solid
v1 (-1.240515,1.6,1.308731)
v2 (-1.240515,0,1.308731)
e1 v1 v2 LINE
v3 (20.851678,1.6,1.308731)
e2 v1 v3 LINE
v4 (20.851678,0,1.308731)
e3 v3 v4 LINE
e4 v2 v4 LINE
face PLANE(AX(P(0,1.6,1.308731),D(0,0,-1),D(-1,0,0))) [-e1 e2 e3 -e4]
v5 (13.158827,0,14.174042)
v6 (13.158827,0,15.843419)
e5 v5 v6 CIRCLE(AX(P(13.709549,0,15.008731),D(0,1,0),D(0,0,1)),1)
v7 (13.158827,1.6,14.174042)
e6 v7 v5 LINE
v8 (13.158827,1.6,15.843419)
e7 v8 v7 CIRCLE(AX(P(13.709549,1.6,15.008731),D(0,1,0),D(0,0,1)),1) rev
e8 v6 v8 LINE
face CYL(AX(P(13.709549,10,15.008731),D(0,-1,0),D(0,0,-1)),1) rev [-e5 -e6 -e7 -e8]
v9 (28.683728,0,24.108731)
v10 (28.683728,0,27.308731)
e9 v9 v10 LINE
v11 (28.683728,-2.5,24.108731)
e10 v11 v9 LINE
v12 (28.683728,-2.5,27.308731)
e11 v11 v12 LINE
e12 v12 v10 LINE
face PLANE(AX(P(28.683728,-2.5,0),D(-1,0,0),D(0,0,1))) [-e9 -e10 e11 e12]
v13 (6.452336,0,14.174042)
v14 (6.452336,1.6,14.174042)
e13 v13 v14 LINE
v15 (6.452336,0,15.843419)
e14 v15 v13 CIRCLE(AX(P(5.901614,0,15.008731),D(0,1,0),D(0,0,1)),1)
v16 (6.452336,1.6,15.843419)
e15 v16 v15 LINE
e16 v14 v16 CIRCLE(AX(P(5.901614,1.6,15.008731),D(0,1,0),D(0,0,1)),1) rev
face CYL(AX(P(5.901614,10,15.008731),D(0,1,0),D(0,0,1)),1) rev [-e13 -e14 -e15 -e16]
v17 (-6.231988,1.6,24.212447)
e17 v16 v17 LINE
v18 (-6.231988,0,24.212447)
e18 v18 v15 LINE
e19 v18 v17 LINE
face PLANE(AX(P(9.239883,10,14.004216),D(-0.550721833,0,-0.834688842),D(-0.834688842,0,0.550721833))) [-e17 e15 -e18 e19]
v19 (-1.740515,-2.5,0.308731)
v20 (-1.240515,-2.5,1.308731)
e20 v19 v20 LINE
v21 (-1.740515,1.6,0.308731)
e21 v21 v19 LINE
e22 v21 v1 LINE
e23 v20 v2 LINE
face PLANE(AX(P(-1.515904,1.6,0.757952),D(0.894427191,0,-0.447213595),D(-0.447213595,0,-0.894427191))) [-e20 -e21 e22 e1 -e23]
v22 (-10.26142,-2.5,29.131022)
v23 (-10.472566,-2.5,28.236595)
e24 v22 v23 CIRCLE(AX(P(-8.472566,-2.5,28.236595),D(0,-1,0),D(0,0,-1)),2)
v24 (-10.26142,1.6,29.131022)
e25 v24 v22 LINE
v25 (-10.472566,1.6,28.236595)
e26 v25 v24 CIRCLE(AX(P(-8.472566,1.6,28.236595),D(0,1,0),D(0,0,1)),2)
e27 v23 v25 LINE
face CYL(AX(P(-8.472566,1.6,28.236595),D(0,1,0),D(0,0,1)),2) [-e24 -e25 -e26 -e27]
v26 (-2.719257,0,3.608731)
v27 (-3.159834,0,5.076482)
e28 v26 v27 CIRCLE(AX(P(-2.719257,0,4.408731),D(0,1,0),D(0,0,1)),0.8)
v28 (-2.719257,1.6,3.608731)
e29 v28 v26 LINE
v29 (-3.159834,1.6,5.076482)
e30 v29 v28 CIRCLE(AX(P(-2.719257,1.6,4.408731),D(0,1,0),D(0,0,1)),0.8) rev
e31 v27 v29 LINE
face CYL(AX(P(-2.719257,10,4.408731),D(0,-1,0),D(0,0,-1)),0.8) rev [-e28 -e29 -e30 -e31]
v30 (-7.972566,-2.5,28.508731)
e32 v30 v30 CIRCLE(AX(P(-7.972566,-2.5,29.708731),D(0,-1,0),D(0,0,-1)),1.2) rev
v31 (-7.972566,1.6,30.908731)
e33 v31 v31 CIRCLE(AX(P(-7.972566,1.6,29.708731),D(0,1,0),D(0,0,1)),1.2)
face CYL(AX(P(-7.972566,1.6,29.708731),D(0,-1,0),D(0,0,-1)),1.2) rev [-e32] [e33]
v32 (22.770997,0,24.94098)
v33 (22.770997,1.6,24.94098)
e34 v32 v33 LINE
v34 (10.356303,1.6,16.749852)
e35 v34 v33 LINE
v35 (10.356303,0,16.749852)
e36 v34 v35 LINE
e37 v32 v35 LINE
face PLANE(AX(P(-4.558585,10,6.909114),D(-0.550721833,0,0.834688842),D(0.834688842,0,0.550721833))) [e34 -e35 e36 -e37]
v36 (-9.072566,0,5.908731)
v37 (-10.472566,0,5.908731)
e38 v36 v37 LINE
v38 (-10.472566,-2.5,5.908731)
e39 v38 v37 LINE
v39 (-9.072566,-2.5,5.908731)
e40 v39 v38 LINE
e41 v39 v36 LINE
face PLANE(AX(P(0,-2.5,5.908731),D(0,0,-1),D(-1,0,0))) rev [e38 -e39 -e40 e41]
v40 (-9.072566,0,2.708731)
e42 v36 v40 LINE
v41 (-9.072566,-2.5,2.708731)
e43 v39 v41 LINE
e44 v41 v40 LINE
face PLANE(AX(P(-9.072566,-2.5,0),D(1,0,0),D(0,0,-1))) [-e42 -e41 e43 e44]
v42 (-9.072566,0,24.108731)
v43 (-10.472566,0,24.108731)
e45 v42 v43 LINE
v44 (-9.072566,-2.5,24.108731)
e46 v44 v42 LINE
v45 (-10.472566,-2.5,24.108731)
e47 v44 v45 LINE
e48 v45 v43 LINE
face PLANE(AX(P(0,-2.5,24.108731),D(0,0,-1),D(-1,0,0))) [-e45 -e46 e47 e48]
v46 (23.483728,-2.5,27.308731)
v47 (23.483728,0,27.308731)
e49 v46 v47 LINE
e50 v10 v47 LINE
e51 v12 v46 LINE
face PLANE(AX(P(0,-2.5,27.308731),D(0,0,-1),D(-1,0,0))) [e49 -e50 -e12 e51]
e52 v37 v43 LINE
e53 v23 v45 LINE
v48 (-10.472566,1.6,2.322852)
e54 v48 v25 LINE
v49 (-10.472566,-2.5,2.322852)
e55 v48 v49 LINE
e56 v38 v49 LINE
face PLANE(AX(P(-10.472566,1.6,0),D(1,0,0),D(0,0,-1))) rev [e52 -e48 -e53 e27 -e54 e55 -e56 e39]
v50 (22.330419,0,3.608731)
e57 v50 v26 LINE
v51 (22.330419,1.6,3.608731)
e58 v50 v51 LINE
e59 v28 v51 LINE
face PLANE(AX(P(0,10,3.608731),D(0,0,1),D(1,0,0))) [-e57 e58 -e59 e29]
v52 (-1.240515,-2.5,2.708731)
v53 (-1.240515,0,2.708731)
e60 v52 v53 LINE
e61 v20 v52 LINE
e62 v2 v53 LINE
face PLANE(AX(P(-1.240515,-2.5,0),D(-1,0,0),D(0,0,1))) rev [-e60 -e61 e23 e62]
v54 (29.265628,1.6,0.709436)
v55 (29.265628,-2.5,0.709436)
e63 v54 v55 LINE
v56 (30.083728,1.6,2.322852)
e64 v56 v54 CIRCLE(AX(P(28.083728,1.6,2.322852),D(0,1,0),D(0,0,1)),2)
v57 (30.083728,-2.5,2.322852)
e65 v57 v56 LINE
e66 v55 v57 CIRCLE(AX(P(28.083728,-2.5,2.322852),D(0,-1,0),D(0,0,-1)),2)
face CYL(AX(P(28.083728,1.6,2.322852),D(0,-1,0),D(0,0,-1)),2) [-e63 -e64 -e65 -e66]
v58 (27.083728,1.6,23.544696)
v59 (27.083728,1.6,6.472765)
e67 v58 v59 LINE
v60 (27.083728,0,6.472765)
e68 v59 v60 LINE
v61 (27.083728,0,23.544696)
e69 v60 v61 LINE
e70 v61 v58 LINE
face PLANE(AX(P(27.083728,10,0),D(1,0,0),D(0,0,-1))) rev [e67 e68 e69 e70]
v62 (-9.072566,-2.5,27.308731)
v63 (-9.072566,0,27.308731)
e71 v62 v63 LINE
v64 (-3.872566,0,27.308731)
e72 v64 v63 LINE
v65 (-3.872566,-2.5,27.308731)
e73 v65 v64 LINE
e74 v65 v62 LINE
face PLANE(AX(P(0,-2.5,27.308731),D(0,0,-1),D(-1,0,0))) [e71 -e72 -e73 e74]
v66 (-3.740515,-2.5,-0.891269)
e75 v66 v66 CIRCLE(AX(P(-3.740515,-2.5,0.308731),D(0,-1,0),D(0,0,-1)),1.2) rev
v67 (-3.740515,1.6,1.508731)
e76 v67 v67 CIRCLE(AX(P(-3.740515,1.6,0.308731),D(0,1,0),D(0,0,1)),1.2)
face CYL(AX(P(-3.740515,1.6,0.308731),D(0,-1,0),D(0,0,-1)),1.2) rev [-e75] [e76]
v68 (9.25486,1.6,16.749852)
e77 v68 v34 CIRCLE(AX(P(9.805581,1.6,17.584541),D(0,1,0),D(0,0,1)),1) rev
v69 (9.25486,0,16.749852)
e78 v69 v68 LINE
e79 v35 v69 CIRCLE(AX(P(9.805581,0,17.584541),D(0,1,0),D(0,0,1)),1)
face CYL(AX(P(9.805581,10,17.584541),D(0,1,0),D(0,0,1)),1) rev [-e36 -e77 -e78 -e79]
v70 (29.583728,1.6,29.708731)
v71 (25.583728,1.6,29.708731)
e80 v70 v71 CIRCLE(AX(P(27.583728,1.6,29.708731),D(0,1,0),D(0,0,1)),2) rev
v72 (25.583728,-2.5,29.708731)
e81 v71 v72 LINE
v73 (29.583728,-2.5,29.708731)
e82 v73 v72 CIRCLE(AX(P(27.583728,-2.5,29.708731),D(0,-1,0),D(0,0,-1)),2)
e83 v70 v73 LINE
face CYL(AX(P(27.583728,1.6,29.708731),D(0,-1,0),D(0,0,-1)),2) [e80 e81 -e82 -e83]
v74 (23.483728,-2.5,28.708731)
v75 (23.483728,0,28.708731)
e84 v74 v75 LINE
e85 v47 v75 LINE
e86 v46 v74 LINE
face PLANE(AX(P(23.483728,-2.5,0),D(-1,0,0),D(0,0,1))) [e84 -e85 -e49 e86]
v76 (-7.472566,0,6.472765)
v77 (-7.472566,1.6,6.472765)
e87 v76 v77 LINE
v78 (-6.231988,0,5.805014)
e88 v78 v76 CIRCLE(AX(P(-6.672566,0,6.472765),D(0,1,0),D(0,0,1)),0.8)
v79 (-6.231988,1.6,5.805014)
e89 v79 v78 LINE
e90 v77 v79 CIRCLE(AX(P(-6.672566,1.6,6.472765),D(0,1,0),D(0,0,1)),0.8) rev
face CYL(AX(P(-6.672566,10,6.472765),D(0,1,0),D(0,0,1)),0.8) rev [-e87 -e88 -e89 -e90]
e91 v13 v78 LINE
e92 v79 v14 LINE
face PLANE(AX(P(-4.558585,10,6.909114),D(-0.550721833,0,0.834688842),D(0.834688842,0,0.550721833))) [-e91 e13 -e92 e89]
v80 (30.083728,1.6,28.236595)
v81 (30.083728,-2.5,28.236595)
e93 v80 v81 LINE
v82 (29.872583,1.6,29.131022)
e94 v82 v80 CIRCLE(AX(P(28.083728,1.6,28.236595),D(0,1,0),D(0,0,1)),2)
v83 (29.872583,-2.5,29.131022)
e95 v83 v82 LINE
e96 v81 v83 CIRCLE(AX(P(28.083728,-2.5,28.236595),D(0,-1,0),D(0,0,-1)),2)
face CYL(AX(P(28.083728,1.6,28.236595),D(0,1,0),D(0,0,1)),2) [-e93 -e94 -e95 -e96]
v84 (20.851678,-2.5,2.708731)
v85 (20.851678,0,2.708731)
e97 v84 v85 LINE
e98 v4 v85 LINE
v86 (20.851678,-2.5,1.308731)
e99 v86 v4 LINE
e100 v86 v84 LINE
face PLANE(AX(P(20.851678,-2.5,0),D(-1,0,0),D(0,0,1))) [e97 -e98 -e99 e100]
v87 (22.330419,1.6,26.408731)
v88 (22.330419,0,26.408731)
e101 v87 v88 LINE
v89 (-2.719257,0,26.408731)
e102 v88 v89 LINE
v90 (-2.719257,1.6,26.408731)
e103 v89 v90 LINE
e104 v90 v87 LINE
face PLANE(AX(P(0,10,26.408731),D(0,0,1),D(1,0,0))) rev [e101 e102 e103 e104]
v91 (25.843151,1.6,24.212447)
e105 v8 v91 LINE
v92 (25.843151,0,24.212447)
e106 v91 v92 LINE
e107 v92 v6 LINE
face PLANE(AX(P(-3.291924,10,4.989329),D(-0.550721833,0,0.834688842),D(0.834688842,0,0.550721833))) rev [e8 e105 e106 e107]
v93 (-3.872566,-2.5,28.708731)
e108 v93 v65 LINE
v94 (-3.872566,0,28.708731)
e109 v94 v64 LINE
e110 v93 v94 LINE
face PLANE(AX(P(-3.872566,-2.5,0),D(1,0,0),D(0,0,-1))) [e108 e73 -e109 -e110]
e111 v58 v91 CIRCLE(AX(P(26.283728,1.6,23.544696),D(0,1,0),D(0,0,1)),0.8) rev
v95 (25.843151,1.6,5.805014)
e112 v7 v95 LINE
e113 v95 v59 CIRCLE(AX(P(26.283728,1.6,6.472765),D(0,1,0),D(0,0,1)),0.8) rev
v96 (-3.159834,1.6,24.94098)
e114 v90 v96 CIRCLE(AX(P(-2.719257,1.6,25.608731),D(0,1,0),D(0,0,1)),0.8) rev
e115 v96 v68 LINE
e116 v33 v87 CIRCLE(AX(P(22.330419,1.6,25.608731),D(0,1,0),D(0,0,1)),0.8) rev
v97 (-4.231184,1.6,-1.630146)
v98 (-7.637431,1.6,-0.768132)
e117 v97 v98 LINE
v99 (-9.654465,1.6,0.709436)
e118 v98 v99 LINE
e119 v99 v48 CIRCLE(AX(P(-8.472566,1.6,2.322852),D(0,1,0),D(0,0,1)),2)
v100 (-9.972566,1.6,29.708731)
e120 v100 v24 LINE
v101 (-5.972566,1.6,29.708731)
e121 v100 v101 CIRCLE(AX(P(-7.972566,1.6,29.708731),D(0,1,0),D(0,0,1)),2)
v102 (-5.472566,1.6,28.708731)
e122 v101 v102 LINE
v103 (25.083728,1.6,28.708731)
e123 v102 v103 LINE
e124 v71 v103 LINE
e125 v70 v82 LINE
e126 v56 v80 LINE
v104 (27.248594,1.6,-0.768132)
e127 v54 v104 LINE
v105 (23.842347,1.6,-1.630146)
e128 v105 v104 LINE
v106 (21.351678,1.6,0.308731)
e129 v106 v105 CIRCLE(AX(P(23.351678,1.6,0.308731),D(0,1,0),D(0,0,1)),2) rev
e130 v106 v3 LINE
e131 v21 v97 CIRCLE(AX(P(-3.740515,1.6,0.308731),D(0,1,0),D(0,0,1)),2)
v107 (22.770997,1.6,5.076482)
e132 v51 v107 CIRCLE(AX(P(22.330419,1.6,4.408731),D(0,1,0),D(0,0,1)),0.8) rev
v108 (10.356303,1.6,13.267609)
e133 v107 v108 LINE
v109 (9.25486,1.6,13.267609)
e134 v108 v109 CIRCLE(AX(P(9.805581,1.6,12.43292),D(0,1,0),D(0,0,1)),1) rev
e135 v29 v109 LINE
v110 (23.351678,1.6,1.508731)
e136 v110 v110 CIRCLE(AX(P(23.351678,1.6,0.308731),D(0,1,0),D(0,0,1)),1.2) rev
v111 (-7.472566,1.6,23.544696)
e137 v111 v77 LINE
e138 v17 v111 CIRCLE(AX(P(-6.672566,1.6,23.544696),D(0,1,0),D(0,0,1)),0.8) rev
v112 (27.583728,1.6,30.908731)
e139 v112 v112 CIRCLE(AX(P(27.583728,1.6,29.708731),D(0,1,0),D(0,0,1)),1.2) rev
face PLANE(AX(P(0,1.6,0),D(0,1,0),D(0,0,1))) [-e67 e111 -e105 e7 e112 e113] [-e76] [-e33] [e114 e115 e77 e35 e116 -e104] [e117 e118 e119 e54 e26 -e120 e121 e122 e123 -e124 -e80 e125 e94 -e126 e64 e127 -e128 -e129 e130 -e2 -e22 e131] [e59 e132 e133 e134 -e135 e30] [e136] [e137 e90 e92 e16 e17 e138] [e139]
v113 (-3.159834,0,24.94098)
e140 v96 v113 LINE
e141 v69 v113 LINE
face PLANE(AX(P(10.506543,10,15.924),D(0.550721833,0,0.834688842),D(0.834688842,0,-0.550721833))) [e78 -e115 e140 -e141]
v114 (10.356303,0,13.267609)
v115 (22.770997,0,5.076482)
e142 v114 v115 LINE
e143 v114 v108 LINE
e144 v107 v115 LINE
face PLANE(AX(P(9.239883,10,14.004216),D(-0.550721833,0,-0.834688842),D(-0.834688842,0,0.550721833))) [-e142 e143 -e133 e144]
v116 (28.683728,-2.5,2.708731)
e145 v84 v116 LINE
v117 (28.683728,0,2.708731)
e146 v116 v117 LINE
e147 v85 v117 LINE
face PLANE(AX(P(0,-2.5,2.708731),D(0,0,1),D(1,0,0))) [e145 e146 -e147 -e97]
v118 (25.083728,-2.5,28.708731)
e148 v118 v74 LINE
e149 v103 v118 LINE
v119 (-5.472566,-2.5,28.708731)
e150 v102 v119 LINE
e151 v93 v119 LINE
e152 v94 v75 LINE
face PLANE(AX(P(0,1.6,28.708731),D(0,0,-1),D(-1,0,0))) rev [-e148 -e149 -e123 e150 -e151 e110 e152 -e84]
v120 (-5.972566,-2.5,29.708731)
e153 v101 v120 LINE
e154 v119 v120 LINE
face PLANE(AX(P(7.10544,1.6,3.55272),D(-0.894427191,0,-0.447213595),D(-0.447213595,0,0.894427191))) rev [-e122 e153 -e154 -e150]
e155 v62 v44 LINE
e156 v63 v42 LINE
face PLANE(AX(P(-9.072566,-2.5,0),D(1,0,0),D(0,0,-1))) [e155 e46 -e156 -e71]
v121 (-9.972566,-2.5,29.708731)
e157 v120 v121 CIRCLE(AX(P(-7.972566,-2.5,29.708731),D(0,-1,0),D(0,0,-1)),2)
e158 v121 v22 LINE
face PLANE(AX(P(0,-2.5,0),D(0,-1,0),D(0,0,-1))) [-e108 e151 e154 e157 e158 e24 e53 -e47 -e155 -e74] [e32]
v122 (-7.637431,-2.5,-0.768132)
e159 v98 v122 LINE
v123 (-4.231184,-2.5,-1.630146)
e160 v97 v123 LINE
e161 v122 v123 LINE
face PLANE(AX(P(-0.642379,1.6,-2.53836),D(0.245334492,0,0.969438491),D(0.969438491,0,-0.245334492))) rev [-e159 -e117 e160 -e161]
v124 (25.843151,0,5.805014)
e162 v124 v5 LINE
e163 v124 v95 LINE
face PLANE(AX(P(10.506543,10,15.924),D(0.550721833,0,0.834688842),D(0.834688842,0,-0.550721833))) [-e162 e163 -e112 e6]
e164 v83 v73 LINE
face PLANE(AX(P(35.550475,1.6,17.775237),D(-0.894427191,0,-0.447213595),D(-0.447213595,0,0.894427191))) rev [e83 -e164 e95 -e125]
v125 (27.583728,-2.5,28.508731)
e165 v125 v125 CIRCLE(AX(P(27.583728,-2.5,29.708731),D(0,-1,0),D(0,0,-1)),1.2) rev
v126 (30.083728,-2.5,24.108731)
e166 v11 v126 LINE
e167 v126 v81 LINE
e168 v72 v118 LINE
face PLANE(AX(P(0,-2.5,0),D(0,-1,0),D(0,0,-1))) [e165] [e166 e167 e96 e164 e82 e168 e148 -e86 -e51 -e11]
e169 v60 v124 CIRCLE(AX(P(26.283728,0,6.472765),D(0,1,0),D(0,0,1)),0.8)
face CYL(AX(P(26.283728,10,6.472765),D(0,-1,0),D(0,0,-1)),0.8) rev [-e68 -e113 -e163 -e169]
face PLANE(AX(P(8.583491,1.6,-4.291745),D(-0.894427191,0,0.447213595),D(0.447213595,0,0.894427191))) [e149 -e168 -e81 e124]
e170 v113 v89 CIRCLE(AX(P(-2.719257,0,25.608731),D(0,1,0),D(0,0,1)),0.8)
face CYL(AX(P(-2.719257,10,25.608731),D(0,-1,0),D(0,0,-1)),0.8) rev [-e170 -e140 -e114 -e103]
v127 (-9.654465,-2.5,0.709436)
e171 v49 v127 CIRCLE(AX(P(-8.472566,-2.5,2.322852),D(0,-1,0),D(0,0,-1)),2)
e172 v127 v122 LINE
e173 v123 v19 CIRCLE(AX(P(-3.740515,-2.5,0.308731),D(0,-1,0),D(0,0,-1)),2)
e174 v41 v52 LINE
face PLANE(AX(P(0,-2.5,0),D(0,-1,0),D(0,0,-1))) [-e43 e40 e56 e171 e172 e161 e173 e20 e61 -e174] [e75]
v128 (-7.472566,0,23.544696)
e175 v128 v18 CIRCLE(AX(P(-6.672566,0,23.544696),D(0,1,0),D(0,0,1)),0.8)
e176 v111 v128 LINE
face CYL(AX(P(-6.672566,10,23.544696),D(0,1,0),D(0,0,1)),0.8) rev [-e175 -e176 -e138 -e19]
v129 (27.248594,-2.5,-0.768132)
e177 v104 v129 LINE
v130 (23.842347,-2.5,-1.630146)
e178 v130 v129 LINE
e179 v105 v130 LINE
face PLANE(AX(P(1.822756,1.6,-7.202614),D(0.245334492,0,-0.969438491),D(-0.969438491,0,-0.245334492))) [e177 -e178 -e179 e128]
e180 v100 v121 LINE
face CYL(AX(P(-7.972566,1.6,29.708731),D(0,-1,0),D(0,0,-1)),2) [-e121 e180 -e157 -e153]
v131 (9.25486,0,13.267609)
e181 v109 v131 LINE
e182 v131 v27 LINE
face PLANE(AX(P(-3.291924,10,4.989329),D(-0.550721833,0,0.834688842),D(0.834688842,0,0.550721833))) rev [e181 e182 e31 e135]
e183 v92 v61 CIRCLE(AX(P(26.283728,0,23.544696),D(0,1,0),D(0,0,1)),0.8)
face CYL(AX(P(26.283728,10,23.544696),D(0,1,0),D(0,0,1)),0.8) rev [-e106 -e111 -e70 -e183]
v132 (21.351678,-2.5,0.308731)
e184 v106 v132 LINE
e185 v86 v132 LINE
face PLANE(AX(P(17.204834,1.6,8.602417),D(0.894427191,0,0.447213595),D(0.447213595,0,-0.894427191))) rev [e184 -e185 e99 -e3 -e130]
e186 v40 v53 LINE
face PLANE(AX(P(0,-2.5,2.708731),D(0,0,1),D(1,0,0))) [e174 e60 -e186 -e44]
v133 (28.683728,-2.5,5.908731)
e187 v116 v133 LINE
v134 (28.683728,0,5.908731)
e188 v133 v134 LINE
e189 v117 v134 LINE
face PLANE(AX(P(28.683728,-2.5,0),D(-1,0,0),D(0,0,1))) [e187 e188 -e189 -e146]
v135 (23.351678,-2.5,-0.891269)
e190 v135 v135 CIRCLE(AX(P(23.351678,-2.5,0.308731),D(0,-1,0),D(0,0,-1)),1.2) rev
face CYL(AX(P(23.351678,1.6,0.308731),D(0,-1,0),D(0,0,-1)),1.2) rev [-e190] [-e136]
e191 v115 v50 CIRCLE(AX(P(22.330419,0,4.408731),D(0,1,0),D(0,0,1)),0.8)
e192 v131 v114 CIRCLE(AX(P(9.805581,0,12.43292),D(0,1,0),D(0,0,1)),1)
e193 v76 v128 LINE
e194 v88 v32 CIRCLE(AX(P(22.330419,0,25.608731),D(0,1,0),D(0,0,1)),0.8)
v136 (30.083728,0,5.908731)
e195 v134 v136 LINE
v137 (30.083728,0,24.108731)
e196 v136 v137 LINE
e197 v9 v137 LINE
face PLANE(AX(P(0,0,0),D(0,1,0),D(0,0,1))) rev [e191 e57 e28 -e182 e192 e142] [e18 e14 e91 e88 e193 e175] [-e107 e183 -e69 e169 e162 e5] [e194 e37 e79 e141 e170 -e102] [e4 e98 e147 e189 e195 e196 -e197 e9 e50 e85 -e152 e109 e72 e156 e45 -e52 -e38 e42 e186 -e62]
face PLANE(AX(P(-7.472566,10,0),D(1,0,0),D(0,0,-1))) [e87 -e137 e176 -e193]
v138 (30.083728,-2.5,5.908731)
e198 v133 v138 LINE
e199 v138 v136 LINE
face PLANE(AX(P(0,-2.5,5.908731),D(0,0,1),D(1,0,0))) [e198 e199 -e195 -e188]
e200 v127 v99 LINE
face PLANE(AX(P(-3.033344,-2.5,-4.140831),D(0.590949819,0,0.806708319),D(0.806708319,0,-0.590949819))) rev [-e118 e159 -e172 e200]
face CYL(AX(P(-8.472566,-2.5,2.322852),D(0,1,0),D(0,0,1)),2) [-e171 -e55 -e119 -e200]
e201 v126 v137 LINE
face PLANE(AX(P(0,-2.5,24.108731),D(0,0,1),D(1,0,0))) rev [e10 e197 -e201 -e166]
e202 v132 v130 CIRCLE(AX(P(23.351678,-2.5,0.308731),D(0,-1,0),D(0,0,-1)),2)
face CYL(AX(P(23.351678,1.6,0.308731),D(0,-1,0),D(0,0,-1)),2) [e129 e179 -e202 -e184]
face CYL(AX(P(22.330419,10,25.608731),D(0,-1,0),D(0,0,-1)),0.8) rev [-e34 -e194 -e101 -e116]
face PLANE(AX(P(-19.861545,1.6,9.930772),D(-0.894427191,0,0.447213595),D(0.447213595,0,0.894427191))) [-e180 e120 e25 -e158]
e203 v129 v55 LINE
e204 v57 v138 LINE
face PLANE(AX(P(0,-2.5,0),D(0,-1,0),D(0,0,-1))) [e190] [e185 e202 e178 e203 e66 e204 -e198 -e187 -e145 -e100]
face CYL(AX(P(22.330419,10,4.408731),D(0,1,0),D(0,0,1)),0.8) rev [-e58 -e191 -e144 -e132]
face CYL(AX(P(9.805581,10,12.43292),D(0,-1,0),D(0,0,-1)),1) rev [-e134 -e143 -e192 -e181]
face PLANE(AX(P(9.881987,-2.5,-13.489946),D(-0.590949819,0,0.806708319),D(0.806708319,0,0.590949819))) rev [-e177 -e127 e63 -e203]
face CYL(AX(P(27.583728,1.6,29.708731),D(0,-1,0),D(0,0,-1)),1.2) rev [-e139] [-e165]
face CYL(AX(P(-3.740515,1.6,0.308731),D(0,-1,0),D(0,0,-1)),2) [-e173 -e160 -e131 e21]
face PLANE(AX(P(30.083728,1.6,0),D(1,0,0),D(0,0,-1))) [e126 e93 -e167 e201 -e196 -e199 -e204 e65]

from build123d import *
from build123d.topology import SkipClean

# Parameters (mm, degrees)
SKETCH1_R                = 1.38
SKETCH1_R_2              = 1
SKETCH1_W                = 37.356294072
SKETCH1_H                = 24.2
BOSS_EXTRUDE2_DEPTH      = 1.6
BOSS_EXTRUDE3_START      = 2.5
SKETCH3_R                = 1
BOSS_EXTRUDE3_DEPTH      = 2.5
SKETCH3_5_R              = 1.38
CUT_EXTRUDE1_DEPTH       = 3
MOVE_START               = -2.5
MOVE_FACE2_OUTLINE_R     = 1.2
MOVE_FACE2_OUTLINE_R_2   = 1
MOVE_FACE2_DEPTH         = 2.5
MOVE_FACE2_2_OUTLINE_R   = 1.2
MOVE_FACE2_2_OUTLINE_R_2 = 1
MOVE_FACE2_2_DEPTH       = 1.6
FILLET4_R                = 2
CUT_EXTRUDE2_DEPTH       = 10
FILLET6_R                = 1
FILLET7_R                = 0.8


# Read off the part's stored shape, not the designer's step: Move Face2
with BuildPart() as part:
    # Sketch1 → Boss-Extrude2 (new body)
    # profile 1 of 2: a face of its own
    with BuildSketch(Plane(origin=(0, 0, 0), x_dir=(1, 0, 0), z_dir=(0, 1, 0))):
        with BuildLine():
            ThreePointArc((29.583728431, -29.708730606), (27.583728431, -31.708730606), (25.583728431, -29.708730606))
            Line((25.583728431, -29.708730606), (25.083728431, -28.708730606))
            Line((25.083728431, -28.708730606), (9.805581395, -28.708730606))
            Line((9.805581395, -28.708730606), (-5.472565641, -28.708730606))
            Line((-5.472565641, -28.708730606), (-5.972565641, -29.708730606))
            ThreePointArc((-5.972565641, -29.708730606), (-7.972565641, -31.708730606), (-9.972565641, -29.708730606))
            Line((-9.972565641, -29.708730606), (-10.472565641, -28.708730606))
            Line((-10.472565641, -28.708730606), (-10.472565641, -6.308730606))
            Line((-10.472565641, -6.308730606), (-14.622565641, 1.591269394))
            ThreePointArc((-14.622565641, 1.591269394), (-16.743885984, 6.712589737), (-11.622565641, 4.591269394))
            Line((-11.622565641, 4.591269394), (-7.637430915, 0.768132014))
            Line((-7.637430915, 0.768132014), (-4.231183814, 1.630146375))
            ThreePointArc((-4.231183814, 1.630146375), (-2.511966494, 1.269454739), (-1.740514831, -0.308730606))
            Line((-1.740514831, -0.308730606), (-1.240514831, -1.308730606))
            Line((-1.240514831, -1.308730606), (20.851677621, -1.308730606))
            Line((20.851677621, -1.308730606), (21.351677621, -0.308730606))
            ThreePointArc((21.351677621, -0.308730606), (22.123129284, 1.269454739), (23.842346605, 1.630146375))
            Line((23.842346605, 1.630146375), (27.248593706, 0.768132014))
            Line((27.248593706, 0.768132014), (31.233728431, 4.591269394))
            ThreePointArc((31.233728431, 4.591269394), (36.355048775, 6.712589737), (34.233728431, 1.591269394))
            Line((34.233728431, 1.591269394), (30.083728431, -6.308730606))
            Line((30.083728431, -6.308730606), (30.083728431, -28.708730606))
            Line((30.083728431, -28.708730606), (29.583728431, -29.708730606))
        make_face()
        with Locations(Location((34.233728431, 4.591269394, 0), (0, 0, 270))):
            Circle(SKETCH1_R, mode=Mode.SUBTRACT)
        with Locations(Location((23.351677621, -0.308730606, 0), (0, 0, 270))):
            Circle(SKETCH1_R_2, mode=Mode.SUBTRACT)
        with Locations(Location((-3.740514831, -0.308730606, 0), (0, 0, 270))):
            Circle(SKETCH1_R_2, mode=Mode.SUBTRACT)
        with Locations(Location((-7.972565641, -29.708730606, 0), (0, 0, 270))):
            Circle(SKETCH1_R_2, mode=Mode.SUBTRACT)
        with Locations(Location((-14.622565641, 4.591269394, 0), (0, 0, 270))):
            Circle(SKETCH1_R, mode=Mode.SUBTRACT)
        with Locations(Location((27.583728431, -29.708730606, 0), (0, 0, 270))):
            Circle(SKETCH1_R_2, mode=Mode.SUBTRACT)
        with Locations((9.805581395, -15.008730606)):
            Rectangle(SKETCH1_W, SKETCH1_H, mode=Mode.SUBTRACT)
    # profile 2 of 2: a face of its own
    with BuildSketch(Plane(origin=(0, 0, 0), x_dir=(1, 0, 0), z_dir=(0, 1, 0))):
        with Locations((9.805581395, -15.008730606)):
            Rectangle(SKETCH1_W, SKETCH1_H)
    extrude(amount=BOSS_EXTRUDE2_DEPTH)

    # Sketch3 → Boss-Extrude3 (add)
    # profile 1 of 4: a face of its own
    with SkipClean():  # the faces are left unmerged after this step: merging them gives an invalid solid
        with BuildSketch(Plane.XZ.offset(BOSS_EXTRUDE3_START)):
            with BuildLine():
                Line((23.483728431, 27.108730606), (28.483728431, 27.108730606))
                Line((28.483728431, 27.108730606), (28.483728431, 24.108730606))
                Line((28.483728431, 24.108730606), (30.083728431, 24.108730606))
                Line((30.083728431, 24.108730606), (30.083728431, 28.708730606))
                Line((30.083728431, 28.708730606), (29.583728431, 29.708730606))
                ThreePointArc((29.583728431, 29.708730606), (27.583728431, 31.708730606), (25.583728431, 29.708730606))
                Line((25.583728431, 29.708730606), (25.083728431, 28.708730606))
                Line((25.083728431, 28.708730606), (23.483728431, 28.708730606))
                Line((23.483728431, 28.708730606), (23.483728431, 27.108730606))
            make_face()
            with Locations(Location((27.583728431, 29.708730606, 0), (0, 0, 270))):
                Circle(SKETCH3_R, mode=Mode.SUBTRACT)
        # profile 2 of 4: a face of its own
        with BuildSketch(Plane.XZ.offset(BOSS_EXTRUDE3_START)):
            with BuildLine():
                Line((-8.872565641, 27.108730606), (-3.872565641, 27.108730606))
                Line((-3.872565641, 27.108730606), (-3.872565641, 28.708730606))
                Line((-3.872565641, 28.708730606), (-5.472565641, 28.708730606))
                Line((-5.472565641, 28.708730606), (-5.972565641, 29.708730606))
                ThreePointArc((-5.972565641, 29.708730606), (-7.972565641, 31.708730606), (-9.972565641, 29.708730606))
                Line((-9.972565641, 29.708730606), (-10.472565641, 28.708730606))
                Line((-10.472565641, 28.708730606), (-10.472565641, 24.108730606))
                Line((-10.472565641, 24.108730606), (-8.872565641, 24.108730606))
                Line((-8.872565641, 24.108730606), (-8.872565641, 27.108730606))
            make_face()
            with Locations(Location((-7.972565641, 29.708730606, 0), (0, 0, 270))):
                Circle(SKETCH3_R, mode=Mode.SUBTRACT)
        # profile 3 of 4: a face of its own
        with BuildSketch(Plane.XZ.offset(BOSS_EXTRUDE3_START)):
            with BuildLine():
                Line((30.083728431, 5.908730606), (28.483728431, 5.908730606))
                Line((28.483728431, 5.908730606), (28.483728431, 2.908730606))
                Line((28.483728431, 2.908730606), (20.851677621, 2.908730606))
                Line((20.851677621, 2.908730606), (20.851677621, 1.308730606))
                Line((20.851677621, 1.308730606), (21.351677621, 0.308730606))
                ThreePointArc((21.351677621, 0.308730606), (22.123129284, -1.269454739), (23.842346605, -1.630146375))
                Line((23.842346605, -1.630146375), (27.248593706, -0.768132014))
                Line((27.248593706, -0.768132014), (30.083728431, 1.308730606))
                Line((30.083728431, 1.308730606), (30.083728431, 5.908730606))
            make_face()
            with Locations(Location((23.351677621, 0.308730606, 0), (0, 0, 270))):
                Circle(SKETCH3_R, mode=Mode.SUBTRACT)
        # profile 4 of 4: a face of its own
        with BuildSketch(Plane.XZ.offset(BOSS_EXTRUDE3_START)):
            with BuildLine():
                Line((-8.872565641, 2.908730606), (-8.872565641, 5.908730606))
                Line((-8.872565641, 5.908730606), (-10.472565641, 5.908730606))
                Line((-10.472565641, 5.908730606), (-10.472565641, 1.308730606))
                Line((-10.472565641, 1.308730606), (-7.637430915, -0.768132014))
                Line((-7.637430915, -0.768132014), (-4.231183814, -1.630146375))
                ThreePointArc((-4.231183814, -1.630146375), (-2.511966494, -1.269454739), (-1.740514831, 0.308730606))
                Line((-1.740514831, 0.308730606), (-1.240514831, 1.308730606))
                Line((-1.240514831, 1.308730606), (-1.240514831, 2.908730606))
                Line((-1.240514831, 2.908730606), (-8.872565641, 2.908730606))
            make_face()
            with Locations(Location((-3.740514831, 0.308730606, 0), (0, 0, 270))):
                Circle(SKETCH3_R, mode=Mode.SUBTRACT)
        extrude(amount=-BOSS_EXTRUDE3_DEPTH)

    # Sketch3<5> → Cut-Extrude1 (cut)
    # profile 1 of 2: a face of its own
    with SkipClean():  # the faces are left unmerged after this step: merging them gives an invalid solid
        with BuildSketch(Plane.XZ):
            with BuildLine():
                Line((27.248593706, -0.768132014), (30.083728431, 1.308730606))
                Line((30.083728431, 1.308730606), (30.083728431, 6.308730606))
                Line((30.083728431, 6.308730606), (34.233728431, -1.591269394))
                ThreePointArc((34.233728431, -1.591269394), (36.355048775, -6.712589737), (31.233728431, -4.591269394))
                Line((31.233728431, -4.591269394), (27.248593706, -0.768132014))
            make_face()
            with Locations((34.233728431, -4.591269394)):
                Circle(SKETCH3_5_R, mode=Mode.SUBTRACT)
        # profile 2 of 2: a face of its own
        with BuildSketch(Plane.XZ):
            with BuildLine():
                Line((-10.472565641, 1.308730606), (-7.637430915, -0.768132014))
                Line((-7.637430915, -0.768132014), (-11.622565641, -4.591269394))
                ThreePointArc((-11.622565641, -4.591269394), (-16.743885984, -6.712589737), (-14.622565641, -1.591269394))
                Line((-14.622565641, -1.591269394), (-10.472565641, 6.308730606))
                Line((-10.472565641, 6.308730606), (-10.472565641, 1.308730606))
            make_face()
            with Locations((-14.622565641, -4.591269394)):
                Circle(SKETCH3_5_R, mode=Mode.SUBTRACT)
        extrude(amount=-CUT_EXTRUDE1_DEPTH, mode=Mode.SUBTRACT)

    # Move Face2 outline → Move Face2 (cut)
    # profile 1 of 8: a face of its own
    with BuildSketch(Plane(origin=(0, 0, 0), x_dir=(1, 0, 0), z_dir=(0, 1, 0)).offset(MOVE_START)):
        with Locations((-7.972565641, -29.708730606)):
            Circle(MOVE_FACE2_OUTLINE_R)
        with Locations((-7.972565641, -29.708730606)):
            Circle(MOVE_FACE2_OUTLINE_R_2, mode=Mode.SUBTRACT)
    # profile 2 of 8: a face of its own
    with BuildSketch(Plane(origin=(0, 0, 0), x_dir=(1, 0, 0), z_dir=(0, 1, 0)).offset(MOVE_START)):
        with Locations((-3.740514831, -0.308730606)):
            Circle(MOVE_FACE2_OUTLINE_R)
        with Locations((-3.740514831, -0.308730606)):
            Circle(MOVE_FACE2_OUTLINE_R_2, mode=Mode.SUBTRACT)
    # profile 3 of 8: a face of its own
    with BuildSketch(Plane(origin=(0, 0, 0), x_dir=(1, 0, 0), z_dir=(0, 1, 0)).offset(MOVE_START)):
        with Locations((23.351677621, -0.308730606)):
            Circle(MOVE_FACE2_OUTLINE_R)
        with Locations((23.351677621, -0.308730606)):
            Circle(MOVE_FACE2_OUTLINE_R_2, mode=Mode.SUBTRACT)
    # profile 4 of 8: a face of its own
    with BuildSketch(Plane(origin=(0, 0, 0), x_dir=(1, 0, 0), z_dir=(0, 1, 0)).offset(MOVE_START)):
        with Locations((27.583728431, -29.708730606)):
            Circle(MOVE_FACE2_OUTLINE_R)
        with Locations((27.583728431, -29.708730606)):
            Circle(MOVE_FACE2_OUTLINE_R_2, mode=Mode.SUBTRACT)
    # profile 5 of 8: a face of its own
    with BuildSketch(Plane(origin=(0, 0, 0), x_dir=(1, 0, 0), z_dir=(0, 1, 0)).offset(MOVE_START)):
        Polygon((23.483728431, -27.308730606), (28.683728431, -27.308730606), (28.683728431, -24.108730606), (28.483728431, -24.108730606), (28.483728431, -27.108730606), (23.483728431, -27.108730606), align=None)
    # profile 6 of 8: a face of its own
    with BuildSketch(Plane(origin=(0, 0, 0), x_dir=(1, 0, 0), z_dir=(0, 1, 0)).offset(MOVE_START)):
        Polygon((-9.072565641, -27.308730606), (-3.872565641, -27.308730606), (-3.872565641, -27.108730606), (-8.872565641, -27.108730606), (-8.872565641, -24.108730606), (-9.072565641, -24.108730606), align=None)
    # profile 7 of 8: a face of its own
    with BuildSketch(Plane(origin=(0, 0, 0), x_dir=(1, 0, 0), z_dir=(0, 1, 0)).offset(MOVE_START)):
        Polygon((28.683728431, -5.908730606), (28.683728431, -2.708730606), (20.851677621, -2.708730606), (20.851677621, -2.908730606), (28.483728431, -2.908730606), (28.483728431, -5.908730606), align=None)
    # profile 8 of 8: a face of its own
    with BuildSketch(Plane(origin=(0, 0, 0), x_dir=(1, 0, 0), z_dir=(0, 1, 0)).offset(MOVE_START)):
        Polygon((-9.072565641, -2.708730606), (-9.072565641, -5.908730606), (-8.872565641, -5.908730606), (-8.872565641, -2.908730606), (-1.240514831, -2.908730606), (-1.240514831, -2.708730606), align=None)
    extrude(amount=MOVE_FACE2_DEPTH, mode=Mode.SUBTRACT)

    # Move Face2 2 outline → Move Face2 2 (cut)
    # profile 1 of 4: a face of its own
    with BuildSketch(Plane(origin=(0, 0, 0), x_dir=(1, 0, 0), z_dir=(0, 1, 0))):
        with Locations((-7.972565641, -29.708730606)):
            Circle(MOVE_FACE2_2_OUTLINE_R)
        with Locations((-7.972565641, -29.708730606)):
            Circle(MOVE_FACE2_2_OUTLINE_R_2, mode=Mode.SUBTRACT)
    # profile 2 of 4: a face of its own
    with BuildSketch(Plane(origin=(0, 0, 0), x_dir=(1, 0, 0), z_dir=(0, 1, 0))):
        with Locations((-3.740514831, -0.308730606)):
            Circle(MOVE_FACE2_2_OUTLINE_R)
        with Locations((-3.740514831, -0.308730606)):
            Circle(MOVE_FACE2_2_OUTLINE_R_2, mode=Mode.SUBTRACT)
    # profile 3 of 4: a face of its own
    with BuildSketch(Plane(origin=(0, 0, 0), x_dir=(1, 0, 0), z_dir=(0, 1, 0))):
        with Locations((23.351677621, -0.308730606)):
            Circle(MOVE_FACE2_2_OUTLINE_R)
        with Locations((23.351677621, -0.308730606)):
            Circle(MOVE_FACE2_2_OUTLINE_R_2, mode=Mode.SUBTRACT)
    # profile 4 of 4: a face of its own
    with BuildSketch(Plane(origin=(0, 0, 0), x_dir=(1, 0, 0), z_dir=(0, 1, 0))):
        with Locations((27.583728431, -29.708730606)):
            Circle(MOVE_FACE2_2_OUTLINE_R)
        with Locations((27.583728431, -29.708730606)):
            Circle(MOVE_FACE2_2_OUTLINE_R_2, mode=Mode.SUBTRACT)
    extrude(amount=MOVE_FACE2_2_DEPTH, mode=Mode.SUBTRACT)

    # Fillet4
    fillet4_edges = [part.edges().sort_by_distance(p)[0] for p in [
        (-10.472565641, -0.45, 1.308730606),
        (30.083728431, -0.45, 1.308730606),
        (-10.472565641, -0.45, 28.708730606),
        (30.083728431, -0.45, 28.708730606),
    ]]
    fillet(fillet4_edges, radius=FILLET4_R)

    # Sketch6 → Cut-Extrude2 (cut)
    with BuildSketch(Plane.XZ):
        Polygon((-7.472565641, 25.030971684), (-7.472565641, 4.986489529), (7.717412865, 15.008730606), align=None)
        Polygon((9.805581395, 16.386489529), (24.995559901, 26.408730606), (-5.38439711, 26.408730606), align=None)
        Polygon((11.893749926, 15.008730606), (27.083728431, 4.986489529), (27.083728431, 25.030971684), align=None)
        Polygon((-5.38439711, 3.608730606), (24.995559901, 3.608730606), (9.805581395, 13.630971684), align=None)
    extrude(amount=-CUT_EXTRUDE2_DEPTH, mode=Mode.SUBTRACT)

    # Fillet6
    fillet6_edges = [part.edges().sort_by_distance(p)[0] for p in [
        (11.893749926, 0.8, 15.008730606),
        (9.805581395, 0.8, 16.386489529),
        (9.805581395, 0.8, 13.630971684),
        (7.717412865, 0.8, 15.008730606),
    ]]
    fillet(fillet6_edges, radius=FILLET6_R)

    # Fillet7
    fillet7_edges = [part.edges().sort_by_distance(p)[0] for p in [
        (27.083728431, 0.8, 4.986489529),
        (27.083728431, 0.8, 25.030971684),
        (-5.38439711, 0.8, 26.408730606),
        (24.995559901, 0.8, 26.408730606),
        (24.995559901, 0.8, 3.608730606),
        (-5.38439711, 0.8, 3.608730606),
        (-7.472565641, 0.8, 4.986489529),
        (-7.472565641, 0.8, 25.030971684),
    ]]
    fillet(fillet7_edges, radius=FILLET7_R)


solid = part.part
